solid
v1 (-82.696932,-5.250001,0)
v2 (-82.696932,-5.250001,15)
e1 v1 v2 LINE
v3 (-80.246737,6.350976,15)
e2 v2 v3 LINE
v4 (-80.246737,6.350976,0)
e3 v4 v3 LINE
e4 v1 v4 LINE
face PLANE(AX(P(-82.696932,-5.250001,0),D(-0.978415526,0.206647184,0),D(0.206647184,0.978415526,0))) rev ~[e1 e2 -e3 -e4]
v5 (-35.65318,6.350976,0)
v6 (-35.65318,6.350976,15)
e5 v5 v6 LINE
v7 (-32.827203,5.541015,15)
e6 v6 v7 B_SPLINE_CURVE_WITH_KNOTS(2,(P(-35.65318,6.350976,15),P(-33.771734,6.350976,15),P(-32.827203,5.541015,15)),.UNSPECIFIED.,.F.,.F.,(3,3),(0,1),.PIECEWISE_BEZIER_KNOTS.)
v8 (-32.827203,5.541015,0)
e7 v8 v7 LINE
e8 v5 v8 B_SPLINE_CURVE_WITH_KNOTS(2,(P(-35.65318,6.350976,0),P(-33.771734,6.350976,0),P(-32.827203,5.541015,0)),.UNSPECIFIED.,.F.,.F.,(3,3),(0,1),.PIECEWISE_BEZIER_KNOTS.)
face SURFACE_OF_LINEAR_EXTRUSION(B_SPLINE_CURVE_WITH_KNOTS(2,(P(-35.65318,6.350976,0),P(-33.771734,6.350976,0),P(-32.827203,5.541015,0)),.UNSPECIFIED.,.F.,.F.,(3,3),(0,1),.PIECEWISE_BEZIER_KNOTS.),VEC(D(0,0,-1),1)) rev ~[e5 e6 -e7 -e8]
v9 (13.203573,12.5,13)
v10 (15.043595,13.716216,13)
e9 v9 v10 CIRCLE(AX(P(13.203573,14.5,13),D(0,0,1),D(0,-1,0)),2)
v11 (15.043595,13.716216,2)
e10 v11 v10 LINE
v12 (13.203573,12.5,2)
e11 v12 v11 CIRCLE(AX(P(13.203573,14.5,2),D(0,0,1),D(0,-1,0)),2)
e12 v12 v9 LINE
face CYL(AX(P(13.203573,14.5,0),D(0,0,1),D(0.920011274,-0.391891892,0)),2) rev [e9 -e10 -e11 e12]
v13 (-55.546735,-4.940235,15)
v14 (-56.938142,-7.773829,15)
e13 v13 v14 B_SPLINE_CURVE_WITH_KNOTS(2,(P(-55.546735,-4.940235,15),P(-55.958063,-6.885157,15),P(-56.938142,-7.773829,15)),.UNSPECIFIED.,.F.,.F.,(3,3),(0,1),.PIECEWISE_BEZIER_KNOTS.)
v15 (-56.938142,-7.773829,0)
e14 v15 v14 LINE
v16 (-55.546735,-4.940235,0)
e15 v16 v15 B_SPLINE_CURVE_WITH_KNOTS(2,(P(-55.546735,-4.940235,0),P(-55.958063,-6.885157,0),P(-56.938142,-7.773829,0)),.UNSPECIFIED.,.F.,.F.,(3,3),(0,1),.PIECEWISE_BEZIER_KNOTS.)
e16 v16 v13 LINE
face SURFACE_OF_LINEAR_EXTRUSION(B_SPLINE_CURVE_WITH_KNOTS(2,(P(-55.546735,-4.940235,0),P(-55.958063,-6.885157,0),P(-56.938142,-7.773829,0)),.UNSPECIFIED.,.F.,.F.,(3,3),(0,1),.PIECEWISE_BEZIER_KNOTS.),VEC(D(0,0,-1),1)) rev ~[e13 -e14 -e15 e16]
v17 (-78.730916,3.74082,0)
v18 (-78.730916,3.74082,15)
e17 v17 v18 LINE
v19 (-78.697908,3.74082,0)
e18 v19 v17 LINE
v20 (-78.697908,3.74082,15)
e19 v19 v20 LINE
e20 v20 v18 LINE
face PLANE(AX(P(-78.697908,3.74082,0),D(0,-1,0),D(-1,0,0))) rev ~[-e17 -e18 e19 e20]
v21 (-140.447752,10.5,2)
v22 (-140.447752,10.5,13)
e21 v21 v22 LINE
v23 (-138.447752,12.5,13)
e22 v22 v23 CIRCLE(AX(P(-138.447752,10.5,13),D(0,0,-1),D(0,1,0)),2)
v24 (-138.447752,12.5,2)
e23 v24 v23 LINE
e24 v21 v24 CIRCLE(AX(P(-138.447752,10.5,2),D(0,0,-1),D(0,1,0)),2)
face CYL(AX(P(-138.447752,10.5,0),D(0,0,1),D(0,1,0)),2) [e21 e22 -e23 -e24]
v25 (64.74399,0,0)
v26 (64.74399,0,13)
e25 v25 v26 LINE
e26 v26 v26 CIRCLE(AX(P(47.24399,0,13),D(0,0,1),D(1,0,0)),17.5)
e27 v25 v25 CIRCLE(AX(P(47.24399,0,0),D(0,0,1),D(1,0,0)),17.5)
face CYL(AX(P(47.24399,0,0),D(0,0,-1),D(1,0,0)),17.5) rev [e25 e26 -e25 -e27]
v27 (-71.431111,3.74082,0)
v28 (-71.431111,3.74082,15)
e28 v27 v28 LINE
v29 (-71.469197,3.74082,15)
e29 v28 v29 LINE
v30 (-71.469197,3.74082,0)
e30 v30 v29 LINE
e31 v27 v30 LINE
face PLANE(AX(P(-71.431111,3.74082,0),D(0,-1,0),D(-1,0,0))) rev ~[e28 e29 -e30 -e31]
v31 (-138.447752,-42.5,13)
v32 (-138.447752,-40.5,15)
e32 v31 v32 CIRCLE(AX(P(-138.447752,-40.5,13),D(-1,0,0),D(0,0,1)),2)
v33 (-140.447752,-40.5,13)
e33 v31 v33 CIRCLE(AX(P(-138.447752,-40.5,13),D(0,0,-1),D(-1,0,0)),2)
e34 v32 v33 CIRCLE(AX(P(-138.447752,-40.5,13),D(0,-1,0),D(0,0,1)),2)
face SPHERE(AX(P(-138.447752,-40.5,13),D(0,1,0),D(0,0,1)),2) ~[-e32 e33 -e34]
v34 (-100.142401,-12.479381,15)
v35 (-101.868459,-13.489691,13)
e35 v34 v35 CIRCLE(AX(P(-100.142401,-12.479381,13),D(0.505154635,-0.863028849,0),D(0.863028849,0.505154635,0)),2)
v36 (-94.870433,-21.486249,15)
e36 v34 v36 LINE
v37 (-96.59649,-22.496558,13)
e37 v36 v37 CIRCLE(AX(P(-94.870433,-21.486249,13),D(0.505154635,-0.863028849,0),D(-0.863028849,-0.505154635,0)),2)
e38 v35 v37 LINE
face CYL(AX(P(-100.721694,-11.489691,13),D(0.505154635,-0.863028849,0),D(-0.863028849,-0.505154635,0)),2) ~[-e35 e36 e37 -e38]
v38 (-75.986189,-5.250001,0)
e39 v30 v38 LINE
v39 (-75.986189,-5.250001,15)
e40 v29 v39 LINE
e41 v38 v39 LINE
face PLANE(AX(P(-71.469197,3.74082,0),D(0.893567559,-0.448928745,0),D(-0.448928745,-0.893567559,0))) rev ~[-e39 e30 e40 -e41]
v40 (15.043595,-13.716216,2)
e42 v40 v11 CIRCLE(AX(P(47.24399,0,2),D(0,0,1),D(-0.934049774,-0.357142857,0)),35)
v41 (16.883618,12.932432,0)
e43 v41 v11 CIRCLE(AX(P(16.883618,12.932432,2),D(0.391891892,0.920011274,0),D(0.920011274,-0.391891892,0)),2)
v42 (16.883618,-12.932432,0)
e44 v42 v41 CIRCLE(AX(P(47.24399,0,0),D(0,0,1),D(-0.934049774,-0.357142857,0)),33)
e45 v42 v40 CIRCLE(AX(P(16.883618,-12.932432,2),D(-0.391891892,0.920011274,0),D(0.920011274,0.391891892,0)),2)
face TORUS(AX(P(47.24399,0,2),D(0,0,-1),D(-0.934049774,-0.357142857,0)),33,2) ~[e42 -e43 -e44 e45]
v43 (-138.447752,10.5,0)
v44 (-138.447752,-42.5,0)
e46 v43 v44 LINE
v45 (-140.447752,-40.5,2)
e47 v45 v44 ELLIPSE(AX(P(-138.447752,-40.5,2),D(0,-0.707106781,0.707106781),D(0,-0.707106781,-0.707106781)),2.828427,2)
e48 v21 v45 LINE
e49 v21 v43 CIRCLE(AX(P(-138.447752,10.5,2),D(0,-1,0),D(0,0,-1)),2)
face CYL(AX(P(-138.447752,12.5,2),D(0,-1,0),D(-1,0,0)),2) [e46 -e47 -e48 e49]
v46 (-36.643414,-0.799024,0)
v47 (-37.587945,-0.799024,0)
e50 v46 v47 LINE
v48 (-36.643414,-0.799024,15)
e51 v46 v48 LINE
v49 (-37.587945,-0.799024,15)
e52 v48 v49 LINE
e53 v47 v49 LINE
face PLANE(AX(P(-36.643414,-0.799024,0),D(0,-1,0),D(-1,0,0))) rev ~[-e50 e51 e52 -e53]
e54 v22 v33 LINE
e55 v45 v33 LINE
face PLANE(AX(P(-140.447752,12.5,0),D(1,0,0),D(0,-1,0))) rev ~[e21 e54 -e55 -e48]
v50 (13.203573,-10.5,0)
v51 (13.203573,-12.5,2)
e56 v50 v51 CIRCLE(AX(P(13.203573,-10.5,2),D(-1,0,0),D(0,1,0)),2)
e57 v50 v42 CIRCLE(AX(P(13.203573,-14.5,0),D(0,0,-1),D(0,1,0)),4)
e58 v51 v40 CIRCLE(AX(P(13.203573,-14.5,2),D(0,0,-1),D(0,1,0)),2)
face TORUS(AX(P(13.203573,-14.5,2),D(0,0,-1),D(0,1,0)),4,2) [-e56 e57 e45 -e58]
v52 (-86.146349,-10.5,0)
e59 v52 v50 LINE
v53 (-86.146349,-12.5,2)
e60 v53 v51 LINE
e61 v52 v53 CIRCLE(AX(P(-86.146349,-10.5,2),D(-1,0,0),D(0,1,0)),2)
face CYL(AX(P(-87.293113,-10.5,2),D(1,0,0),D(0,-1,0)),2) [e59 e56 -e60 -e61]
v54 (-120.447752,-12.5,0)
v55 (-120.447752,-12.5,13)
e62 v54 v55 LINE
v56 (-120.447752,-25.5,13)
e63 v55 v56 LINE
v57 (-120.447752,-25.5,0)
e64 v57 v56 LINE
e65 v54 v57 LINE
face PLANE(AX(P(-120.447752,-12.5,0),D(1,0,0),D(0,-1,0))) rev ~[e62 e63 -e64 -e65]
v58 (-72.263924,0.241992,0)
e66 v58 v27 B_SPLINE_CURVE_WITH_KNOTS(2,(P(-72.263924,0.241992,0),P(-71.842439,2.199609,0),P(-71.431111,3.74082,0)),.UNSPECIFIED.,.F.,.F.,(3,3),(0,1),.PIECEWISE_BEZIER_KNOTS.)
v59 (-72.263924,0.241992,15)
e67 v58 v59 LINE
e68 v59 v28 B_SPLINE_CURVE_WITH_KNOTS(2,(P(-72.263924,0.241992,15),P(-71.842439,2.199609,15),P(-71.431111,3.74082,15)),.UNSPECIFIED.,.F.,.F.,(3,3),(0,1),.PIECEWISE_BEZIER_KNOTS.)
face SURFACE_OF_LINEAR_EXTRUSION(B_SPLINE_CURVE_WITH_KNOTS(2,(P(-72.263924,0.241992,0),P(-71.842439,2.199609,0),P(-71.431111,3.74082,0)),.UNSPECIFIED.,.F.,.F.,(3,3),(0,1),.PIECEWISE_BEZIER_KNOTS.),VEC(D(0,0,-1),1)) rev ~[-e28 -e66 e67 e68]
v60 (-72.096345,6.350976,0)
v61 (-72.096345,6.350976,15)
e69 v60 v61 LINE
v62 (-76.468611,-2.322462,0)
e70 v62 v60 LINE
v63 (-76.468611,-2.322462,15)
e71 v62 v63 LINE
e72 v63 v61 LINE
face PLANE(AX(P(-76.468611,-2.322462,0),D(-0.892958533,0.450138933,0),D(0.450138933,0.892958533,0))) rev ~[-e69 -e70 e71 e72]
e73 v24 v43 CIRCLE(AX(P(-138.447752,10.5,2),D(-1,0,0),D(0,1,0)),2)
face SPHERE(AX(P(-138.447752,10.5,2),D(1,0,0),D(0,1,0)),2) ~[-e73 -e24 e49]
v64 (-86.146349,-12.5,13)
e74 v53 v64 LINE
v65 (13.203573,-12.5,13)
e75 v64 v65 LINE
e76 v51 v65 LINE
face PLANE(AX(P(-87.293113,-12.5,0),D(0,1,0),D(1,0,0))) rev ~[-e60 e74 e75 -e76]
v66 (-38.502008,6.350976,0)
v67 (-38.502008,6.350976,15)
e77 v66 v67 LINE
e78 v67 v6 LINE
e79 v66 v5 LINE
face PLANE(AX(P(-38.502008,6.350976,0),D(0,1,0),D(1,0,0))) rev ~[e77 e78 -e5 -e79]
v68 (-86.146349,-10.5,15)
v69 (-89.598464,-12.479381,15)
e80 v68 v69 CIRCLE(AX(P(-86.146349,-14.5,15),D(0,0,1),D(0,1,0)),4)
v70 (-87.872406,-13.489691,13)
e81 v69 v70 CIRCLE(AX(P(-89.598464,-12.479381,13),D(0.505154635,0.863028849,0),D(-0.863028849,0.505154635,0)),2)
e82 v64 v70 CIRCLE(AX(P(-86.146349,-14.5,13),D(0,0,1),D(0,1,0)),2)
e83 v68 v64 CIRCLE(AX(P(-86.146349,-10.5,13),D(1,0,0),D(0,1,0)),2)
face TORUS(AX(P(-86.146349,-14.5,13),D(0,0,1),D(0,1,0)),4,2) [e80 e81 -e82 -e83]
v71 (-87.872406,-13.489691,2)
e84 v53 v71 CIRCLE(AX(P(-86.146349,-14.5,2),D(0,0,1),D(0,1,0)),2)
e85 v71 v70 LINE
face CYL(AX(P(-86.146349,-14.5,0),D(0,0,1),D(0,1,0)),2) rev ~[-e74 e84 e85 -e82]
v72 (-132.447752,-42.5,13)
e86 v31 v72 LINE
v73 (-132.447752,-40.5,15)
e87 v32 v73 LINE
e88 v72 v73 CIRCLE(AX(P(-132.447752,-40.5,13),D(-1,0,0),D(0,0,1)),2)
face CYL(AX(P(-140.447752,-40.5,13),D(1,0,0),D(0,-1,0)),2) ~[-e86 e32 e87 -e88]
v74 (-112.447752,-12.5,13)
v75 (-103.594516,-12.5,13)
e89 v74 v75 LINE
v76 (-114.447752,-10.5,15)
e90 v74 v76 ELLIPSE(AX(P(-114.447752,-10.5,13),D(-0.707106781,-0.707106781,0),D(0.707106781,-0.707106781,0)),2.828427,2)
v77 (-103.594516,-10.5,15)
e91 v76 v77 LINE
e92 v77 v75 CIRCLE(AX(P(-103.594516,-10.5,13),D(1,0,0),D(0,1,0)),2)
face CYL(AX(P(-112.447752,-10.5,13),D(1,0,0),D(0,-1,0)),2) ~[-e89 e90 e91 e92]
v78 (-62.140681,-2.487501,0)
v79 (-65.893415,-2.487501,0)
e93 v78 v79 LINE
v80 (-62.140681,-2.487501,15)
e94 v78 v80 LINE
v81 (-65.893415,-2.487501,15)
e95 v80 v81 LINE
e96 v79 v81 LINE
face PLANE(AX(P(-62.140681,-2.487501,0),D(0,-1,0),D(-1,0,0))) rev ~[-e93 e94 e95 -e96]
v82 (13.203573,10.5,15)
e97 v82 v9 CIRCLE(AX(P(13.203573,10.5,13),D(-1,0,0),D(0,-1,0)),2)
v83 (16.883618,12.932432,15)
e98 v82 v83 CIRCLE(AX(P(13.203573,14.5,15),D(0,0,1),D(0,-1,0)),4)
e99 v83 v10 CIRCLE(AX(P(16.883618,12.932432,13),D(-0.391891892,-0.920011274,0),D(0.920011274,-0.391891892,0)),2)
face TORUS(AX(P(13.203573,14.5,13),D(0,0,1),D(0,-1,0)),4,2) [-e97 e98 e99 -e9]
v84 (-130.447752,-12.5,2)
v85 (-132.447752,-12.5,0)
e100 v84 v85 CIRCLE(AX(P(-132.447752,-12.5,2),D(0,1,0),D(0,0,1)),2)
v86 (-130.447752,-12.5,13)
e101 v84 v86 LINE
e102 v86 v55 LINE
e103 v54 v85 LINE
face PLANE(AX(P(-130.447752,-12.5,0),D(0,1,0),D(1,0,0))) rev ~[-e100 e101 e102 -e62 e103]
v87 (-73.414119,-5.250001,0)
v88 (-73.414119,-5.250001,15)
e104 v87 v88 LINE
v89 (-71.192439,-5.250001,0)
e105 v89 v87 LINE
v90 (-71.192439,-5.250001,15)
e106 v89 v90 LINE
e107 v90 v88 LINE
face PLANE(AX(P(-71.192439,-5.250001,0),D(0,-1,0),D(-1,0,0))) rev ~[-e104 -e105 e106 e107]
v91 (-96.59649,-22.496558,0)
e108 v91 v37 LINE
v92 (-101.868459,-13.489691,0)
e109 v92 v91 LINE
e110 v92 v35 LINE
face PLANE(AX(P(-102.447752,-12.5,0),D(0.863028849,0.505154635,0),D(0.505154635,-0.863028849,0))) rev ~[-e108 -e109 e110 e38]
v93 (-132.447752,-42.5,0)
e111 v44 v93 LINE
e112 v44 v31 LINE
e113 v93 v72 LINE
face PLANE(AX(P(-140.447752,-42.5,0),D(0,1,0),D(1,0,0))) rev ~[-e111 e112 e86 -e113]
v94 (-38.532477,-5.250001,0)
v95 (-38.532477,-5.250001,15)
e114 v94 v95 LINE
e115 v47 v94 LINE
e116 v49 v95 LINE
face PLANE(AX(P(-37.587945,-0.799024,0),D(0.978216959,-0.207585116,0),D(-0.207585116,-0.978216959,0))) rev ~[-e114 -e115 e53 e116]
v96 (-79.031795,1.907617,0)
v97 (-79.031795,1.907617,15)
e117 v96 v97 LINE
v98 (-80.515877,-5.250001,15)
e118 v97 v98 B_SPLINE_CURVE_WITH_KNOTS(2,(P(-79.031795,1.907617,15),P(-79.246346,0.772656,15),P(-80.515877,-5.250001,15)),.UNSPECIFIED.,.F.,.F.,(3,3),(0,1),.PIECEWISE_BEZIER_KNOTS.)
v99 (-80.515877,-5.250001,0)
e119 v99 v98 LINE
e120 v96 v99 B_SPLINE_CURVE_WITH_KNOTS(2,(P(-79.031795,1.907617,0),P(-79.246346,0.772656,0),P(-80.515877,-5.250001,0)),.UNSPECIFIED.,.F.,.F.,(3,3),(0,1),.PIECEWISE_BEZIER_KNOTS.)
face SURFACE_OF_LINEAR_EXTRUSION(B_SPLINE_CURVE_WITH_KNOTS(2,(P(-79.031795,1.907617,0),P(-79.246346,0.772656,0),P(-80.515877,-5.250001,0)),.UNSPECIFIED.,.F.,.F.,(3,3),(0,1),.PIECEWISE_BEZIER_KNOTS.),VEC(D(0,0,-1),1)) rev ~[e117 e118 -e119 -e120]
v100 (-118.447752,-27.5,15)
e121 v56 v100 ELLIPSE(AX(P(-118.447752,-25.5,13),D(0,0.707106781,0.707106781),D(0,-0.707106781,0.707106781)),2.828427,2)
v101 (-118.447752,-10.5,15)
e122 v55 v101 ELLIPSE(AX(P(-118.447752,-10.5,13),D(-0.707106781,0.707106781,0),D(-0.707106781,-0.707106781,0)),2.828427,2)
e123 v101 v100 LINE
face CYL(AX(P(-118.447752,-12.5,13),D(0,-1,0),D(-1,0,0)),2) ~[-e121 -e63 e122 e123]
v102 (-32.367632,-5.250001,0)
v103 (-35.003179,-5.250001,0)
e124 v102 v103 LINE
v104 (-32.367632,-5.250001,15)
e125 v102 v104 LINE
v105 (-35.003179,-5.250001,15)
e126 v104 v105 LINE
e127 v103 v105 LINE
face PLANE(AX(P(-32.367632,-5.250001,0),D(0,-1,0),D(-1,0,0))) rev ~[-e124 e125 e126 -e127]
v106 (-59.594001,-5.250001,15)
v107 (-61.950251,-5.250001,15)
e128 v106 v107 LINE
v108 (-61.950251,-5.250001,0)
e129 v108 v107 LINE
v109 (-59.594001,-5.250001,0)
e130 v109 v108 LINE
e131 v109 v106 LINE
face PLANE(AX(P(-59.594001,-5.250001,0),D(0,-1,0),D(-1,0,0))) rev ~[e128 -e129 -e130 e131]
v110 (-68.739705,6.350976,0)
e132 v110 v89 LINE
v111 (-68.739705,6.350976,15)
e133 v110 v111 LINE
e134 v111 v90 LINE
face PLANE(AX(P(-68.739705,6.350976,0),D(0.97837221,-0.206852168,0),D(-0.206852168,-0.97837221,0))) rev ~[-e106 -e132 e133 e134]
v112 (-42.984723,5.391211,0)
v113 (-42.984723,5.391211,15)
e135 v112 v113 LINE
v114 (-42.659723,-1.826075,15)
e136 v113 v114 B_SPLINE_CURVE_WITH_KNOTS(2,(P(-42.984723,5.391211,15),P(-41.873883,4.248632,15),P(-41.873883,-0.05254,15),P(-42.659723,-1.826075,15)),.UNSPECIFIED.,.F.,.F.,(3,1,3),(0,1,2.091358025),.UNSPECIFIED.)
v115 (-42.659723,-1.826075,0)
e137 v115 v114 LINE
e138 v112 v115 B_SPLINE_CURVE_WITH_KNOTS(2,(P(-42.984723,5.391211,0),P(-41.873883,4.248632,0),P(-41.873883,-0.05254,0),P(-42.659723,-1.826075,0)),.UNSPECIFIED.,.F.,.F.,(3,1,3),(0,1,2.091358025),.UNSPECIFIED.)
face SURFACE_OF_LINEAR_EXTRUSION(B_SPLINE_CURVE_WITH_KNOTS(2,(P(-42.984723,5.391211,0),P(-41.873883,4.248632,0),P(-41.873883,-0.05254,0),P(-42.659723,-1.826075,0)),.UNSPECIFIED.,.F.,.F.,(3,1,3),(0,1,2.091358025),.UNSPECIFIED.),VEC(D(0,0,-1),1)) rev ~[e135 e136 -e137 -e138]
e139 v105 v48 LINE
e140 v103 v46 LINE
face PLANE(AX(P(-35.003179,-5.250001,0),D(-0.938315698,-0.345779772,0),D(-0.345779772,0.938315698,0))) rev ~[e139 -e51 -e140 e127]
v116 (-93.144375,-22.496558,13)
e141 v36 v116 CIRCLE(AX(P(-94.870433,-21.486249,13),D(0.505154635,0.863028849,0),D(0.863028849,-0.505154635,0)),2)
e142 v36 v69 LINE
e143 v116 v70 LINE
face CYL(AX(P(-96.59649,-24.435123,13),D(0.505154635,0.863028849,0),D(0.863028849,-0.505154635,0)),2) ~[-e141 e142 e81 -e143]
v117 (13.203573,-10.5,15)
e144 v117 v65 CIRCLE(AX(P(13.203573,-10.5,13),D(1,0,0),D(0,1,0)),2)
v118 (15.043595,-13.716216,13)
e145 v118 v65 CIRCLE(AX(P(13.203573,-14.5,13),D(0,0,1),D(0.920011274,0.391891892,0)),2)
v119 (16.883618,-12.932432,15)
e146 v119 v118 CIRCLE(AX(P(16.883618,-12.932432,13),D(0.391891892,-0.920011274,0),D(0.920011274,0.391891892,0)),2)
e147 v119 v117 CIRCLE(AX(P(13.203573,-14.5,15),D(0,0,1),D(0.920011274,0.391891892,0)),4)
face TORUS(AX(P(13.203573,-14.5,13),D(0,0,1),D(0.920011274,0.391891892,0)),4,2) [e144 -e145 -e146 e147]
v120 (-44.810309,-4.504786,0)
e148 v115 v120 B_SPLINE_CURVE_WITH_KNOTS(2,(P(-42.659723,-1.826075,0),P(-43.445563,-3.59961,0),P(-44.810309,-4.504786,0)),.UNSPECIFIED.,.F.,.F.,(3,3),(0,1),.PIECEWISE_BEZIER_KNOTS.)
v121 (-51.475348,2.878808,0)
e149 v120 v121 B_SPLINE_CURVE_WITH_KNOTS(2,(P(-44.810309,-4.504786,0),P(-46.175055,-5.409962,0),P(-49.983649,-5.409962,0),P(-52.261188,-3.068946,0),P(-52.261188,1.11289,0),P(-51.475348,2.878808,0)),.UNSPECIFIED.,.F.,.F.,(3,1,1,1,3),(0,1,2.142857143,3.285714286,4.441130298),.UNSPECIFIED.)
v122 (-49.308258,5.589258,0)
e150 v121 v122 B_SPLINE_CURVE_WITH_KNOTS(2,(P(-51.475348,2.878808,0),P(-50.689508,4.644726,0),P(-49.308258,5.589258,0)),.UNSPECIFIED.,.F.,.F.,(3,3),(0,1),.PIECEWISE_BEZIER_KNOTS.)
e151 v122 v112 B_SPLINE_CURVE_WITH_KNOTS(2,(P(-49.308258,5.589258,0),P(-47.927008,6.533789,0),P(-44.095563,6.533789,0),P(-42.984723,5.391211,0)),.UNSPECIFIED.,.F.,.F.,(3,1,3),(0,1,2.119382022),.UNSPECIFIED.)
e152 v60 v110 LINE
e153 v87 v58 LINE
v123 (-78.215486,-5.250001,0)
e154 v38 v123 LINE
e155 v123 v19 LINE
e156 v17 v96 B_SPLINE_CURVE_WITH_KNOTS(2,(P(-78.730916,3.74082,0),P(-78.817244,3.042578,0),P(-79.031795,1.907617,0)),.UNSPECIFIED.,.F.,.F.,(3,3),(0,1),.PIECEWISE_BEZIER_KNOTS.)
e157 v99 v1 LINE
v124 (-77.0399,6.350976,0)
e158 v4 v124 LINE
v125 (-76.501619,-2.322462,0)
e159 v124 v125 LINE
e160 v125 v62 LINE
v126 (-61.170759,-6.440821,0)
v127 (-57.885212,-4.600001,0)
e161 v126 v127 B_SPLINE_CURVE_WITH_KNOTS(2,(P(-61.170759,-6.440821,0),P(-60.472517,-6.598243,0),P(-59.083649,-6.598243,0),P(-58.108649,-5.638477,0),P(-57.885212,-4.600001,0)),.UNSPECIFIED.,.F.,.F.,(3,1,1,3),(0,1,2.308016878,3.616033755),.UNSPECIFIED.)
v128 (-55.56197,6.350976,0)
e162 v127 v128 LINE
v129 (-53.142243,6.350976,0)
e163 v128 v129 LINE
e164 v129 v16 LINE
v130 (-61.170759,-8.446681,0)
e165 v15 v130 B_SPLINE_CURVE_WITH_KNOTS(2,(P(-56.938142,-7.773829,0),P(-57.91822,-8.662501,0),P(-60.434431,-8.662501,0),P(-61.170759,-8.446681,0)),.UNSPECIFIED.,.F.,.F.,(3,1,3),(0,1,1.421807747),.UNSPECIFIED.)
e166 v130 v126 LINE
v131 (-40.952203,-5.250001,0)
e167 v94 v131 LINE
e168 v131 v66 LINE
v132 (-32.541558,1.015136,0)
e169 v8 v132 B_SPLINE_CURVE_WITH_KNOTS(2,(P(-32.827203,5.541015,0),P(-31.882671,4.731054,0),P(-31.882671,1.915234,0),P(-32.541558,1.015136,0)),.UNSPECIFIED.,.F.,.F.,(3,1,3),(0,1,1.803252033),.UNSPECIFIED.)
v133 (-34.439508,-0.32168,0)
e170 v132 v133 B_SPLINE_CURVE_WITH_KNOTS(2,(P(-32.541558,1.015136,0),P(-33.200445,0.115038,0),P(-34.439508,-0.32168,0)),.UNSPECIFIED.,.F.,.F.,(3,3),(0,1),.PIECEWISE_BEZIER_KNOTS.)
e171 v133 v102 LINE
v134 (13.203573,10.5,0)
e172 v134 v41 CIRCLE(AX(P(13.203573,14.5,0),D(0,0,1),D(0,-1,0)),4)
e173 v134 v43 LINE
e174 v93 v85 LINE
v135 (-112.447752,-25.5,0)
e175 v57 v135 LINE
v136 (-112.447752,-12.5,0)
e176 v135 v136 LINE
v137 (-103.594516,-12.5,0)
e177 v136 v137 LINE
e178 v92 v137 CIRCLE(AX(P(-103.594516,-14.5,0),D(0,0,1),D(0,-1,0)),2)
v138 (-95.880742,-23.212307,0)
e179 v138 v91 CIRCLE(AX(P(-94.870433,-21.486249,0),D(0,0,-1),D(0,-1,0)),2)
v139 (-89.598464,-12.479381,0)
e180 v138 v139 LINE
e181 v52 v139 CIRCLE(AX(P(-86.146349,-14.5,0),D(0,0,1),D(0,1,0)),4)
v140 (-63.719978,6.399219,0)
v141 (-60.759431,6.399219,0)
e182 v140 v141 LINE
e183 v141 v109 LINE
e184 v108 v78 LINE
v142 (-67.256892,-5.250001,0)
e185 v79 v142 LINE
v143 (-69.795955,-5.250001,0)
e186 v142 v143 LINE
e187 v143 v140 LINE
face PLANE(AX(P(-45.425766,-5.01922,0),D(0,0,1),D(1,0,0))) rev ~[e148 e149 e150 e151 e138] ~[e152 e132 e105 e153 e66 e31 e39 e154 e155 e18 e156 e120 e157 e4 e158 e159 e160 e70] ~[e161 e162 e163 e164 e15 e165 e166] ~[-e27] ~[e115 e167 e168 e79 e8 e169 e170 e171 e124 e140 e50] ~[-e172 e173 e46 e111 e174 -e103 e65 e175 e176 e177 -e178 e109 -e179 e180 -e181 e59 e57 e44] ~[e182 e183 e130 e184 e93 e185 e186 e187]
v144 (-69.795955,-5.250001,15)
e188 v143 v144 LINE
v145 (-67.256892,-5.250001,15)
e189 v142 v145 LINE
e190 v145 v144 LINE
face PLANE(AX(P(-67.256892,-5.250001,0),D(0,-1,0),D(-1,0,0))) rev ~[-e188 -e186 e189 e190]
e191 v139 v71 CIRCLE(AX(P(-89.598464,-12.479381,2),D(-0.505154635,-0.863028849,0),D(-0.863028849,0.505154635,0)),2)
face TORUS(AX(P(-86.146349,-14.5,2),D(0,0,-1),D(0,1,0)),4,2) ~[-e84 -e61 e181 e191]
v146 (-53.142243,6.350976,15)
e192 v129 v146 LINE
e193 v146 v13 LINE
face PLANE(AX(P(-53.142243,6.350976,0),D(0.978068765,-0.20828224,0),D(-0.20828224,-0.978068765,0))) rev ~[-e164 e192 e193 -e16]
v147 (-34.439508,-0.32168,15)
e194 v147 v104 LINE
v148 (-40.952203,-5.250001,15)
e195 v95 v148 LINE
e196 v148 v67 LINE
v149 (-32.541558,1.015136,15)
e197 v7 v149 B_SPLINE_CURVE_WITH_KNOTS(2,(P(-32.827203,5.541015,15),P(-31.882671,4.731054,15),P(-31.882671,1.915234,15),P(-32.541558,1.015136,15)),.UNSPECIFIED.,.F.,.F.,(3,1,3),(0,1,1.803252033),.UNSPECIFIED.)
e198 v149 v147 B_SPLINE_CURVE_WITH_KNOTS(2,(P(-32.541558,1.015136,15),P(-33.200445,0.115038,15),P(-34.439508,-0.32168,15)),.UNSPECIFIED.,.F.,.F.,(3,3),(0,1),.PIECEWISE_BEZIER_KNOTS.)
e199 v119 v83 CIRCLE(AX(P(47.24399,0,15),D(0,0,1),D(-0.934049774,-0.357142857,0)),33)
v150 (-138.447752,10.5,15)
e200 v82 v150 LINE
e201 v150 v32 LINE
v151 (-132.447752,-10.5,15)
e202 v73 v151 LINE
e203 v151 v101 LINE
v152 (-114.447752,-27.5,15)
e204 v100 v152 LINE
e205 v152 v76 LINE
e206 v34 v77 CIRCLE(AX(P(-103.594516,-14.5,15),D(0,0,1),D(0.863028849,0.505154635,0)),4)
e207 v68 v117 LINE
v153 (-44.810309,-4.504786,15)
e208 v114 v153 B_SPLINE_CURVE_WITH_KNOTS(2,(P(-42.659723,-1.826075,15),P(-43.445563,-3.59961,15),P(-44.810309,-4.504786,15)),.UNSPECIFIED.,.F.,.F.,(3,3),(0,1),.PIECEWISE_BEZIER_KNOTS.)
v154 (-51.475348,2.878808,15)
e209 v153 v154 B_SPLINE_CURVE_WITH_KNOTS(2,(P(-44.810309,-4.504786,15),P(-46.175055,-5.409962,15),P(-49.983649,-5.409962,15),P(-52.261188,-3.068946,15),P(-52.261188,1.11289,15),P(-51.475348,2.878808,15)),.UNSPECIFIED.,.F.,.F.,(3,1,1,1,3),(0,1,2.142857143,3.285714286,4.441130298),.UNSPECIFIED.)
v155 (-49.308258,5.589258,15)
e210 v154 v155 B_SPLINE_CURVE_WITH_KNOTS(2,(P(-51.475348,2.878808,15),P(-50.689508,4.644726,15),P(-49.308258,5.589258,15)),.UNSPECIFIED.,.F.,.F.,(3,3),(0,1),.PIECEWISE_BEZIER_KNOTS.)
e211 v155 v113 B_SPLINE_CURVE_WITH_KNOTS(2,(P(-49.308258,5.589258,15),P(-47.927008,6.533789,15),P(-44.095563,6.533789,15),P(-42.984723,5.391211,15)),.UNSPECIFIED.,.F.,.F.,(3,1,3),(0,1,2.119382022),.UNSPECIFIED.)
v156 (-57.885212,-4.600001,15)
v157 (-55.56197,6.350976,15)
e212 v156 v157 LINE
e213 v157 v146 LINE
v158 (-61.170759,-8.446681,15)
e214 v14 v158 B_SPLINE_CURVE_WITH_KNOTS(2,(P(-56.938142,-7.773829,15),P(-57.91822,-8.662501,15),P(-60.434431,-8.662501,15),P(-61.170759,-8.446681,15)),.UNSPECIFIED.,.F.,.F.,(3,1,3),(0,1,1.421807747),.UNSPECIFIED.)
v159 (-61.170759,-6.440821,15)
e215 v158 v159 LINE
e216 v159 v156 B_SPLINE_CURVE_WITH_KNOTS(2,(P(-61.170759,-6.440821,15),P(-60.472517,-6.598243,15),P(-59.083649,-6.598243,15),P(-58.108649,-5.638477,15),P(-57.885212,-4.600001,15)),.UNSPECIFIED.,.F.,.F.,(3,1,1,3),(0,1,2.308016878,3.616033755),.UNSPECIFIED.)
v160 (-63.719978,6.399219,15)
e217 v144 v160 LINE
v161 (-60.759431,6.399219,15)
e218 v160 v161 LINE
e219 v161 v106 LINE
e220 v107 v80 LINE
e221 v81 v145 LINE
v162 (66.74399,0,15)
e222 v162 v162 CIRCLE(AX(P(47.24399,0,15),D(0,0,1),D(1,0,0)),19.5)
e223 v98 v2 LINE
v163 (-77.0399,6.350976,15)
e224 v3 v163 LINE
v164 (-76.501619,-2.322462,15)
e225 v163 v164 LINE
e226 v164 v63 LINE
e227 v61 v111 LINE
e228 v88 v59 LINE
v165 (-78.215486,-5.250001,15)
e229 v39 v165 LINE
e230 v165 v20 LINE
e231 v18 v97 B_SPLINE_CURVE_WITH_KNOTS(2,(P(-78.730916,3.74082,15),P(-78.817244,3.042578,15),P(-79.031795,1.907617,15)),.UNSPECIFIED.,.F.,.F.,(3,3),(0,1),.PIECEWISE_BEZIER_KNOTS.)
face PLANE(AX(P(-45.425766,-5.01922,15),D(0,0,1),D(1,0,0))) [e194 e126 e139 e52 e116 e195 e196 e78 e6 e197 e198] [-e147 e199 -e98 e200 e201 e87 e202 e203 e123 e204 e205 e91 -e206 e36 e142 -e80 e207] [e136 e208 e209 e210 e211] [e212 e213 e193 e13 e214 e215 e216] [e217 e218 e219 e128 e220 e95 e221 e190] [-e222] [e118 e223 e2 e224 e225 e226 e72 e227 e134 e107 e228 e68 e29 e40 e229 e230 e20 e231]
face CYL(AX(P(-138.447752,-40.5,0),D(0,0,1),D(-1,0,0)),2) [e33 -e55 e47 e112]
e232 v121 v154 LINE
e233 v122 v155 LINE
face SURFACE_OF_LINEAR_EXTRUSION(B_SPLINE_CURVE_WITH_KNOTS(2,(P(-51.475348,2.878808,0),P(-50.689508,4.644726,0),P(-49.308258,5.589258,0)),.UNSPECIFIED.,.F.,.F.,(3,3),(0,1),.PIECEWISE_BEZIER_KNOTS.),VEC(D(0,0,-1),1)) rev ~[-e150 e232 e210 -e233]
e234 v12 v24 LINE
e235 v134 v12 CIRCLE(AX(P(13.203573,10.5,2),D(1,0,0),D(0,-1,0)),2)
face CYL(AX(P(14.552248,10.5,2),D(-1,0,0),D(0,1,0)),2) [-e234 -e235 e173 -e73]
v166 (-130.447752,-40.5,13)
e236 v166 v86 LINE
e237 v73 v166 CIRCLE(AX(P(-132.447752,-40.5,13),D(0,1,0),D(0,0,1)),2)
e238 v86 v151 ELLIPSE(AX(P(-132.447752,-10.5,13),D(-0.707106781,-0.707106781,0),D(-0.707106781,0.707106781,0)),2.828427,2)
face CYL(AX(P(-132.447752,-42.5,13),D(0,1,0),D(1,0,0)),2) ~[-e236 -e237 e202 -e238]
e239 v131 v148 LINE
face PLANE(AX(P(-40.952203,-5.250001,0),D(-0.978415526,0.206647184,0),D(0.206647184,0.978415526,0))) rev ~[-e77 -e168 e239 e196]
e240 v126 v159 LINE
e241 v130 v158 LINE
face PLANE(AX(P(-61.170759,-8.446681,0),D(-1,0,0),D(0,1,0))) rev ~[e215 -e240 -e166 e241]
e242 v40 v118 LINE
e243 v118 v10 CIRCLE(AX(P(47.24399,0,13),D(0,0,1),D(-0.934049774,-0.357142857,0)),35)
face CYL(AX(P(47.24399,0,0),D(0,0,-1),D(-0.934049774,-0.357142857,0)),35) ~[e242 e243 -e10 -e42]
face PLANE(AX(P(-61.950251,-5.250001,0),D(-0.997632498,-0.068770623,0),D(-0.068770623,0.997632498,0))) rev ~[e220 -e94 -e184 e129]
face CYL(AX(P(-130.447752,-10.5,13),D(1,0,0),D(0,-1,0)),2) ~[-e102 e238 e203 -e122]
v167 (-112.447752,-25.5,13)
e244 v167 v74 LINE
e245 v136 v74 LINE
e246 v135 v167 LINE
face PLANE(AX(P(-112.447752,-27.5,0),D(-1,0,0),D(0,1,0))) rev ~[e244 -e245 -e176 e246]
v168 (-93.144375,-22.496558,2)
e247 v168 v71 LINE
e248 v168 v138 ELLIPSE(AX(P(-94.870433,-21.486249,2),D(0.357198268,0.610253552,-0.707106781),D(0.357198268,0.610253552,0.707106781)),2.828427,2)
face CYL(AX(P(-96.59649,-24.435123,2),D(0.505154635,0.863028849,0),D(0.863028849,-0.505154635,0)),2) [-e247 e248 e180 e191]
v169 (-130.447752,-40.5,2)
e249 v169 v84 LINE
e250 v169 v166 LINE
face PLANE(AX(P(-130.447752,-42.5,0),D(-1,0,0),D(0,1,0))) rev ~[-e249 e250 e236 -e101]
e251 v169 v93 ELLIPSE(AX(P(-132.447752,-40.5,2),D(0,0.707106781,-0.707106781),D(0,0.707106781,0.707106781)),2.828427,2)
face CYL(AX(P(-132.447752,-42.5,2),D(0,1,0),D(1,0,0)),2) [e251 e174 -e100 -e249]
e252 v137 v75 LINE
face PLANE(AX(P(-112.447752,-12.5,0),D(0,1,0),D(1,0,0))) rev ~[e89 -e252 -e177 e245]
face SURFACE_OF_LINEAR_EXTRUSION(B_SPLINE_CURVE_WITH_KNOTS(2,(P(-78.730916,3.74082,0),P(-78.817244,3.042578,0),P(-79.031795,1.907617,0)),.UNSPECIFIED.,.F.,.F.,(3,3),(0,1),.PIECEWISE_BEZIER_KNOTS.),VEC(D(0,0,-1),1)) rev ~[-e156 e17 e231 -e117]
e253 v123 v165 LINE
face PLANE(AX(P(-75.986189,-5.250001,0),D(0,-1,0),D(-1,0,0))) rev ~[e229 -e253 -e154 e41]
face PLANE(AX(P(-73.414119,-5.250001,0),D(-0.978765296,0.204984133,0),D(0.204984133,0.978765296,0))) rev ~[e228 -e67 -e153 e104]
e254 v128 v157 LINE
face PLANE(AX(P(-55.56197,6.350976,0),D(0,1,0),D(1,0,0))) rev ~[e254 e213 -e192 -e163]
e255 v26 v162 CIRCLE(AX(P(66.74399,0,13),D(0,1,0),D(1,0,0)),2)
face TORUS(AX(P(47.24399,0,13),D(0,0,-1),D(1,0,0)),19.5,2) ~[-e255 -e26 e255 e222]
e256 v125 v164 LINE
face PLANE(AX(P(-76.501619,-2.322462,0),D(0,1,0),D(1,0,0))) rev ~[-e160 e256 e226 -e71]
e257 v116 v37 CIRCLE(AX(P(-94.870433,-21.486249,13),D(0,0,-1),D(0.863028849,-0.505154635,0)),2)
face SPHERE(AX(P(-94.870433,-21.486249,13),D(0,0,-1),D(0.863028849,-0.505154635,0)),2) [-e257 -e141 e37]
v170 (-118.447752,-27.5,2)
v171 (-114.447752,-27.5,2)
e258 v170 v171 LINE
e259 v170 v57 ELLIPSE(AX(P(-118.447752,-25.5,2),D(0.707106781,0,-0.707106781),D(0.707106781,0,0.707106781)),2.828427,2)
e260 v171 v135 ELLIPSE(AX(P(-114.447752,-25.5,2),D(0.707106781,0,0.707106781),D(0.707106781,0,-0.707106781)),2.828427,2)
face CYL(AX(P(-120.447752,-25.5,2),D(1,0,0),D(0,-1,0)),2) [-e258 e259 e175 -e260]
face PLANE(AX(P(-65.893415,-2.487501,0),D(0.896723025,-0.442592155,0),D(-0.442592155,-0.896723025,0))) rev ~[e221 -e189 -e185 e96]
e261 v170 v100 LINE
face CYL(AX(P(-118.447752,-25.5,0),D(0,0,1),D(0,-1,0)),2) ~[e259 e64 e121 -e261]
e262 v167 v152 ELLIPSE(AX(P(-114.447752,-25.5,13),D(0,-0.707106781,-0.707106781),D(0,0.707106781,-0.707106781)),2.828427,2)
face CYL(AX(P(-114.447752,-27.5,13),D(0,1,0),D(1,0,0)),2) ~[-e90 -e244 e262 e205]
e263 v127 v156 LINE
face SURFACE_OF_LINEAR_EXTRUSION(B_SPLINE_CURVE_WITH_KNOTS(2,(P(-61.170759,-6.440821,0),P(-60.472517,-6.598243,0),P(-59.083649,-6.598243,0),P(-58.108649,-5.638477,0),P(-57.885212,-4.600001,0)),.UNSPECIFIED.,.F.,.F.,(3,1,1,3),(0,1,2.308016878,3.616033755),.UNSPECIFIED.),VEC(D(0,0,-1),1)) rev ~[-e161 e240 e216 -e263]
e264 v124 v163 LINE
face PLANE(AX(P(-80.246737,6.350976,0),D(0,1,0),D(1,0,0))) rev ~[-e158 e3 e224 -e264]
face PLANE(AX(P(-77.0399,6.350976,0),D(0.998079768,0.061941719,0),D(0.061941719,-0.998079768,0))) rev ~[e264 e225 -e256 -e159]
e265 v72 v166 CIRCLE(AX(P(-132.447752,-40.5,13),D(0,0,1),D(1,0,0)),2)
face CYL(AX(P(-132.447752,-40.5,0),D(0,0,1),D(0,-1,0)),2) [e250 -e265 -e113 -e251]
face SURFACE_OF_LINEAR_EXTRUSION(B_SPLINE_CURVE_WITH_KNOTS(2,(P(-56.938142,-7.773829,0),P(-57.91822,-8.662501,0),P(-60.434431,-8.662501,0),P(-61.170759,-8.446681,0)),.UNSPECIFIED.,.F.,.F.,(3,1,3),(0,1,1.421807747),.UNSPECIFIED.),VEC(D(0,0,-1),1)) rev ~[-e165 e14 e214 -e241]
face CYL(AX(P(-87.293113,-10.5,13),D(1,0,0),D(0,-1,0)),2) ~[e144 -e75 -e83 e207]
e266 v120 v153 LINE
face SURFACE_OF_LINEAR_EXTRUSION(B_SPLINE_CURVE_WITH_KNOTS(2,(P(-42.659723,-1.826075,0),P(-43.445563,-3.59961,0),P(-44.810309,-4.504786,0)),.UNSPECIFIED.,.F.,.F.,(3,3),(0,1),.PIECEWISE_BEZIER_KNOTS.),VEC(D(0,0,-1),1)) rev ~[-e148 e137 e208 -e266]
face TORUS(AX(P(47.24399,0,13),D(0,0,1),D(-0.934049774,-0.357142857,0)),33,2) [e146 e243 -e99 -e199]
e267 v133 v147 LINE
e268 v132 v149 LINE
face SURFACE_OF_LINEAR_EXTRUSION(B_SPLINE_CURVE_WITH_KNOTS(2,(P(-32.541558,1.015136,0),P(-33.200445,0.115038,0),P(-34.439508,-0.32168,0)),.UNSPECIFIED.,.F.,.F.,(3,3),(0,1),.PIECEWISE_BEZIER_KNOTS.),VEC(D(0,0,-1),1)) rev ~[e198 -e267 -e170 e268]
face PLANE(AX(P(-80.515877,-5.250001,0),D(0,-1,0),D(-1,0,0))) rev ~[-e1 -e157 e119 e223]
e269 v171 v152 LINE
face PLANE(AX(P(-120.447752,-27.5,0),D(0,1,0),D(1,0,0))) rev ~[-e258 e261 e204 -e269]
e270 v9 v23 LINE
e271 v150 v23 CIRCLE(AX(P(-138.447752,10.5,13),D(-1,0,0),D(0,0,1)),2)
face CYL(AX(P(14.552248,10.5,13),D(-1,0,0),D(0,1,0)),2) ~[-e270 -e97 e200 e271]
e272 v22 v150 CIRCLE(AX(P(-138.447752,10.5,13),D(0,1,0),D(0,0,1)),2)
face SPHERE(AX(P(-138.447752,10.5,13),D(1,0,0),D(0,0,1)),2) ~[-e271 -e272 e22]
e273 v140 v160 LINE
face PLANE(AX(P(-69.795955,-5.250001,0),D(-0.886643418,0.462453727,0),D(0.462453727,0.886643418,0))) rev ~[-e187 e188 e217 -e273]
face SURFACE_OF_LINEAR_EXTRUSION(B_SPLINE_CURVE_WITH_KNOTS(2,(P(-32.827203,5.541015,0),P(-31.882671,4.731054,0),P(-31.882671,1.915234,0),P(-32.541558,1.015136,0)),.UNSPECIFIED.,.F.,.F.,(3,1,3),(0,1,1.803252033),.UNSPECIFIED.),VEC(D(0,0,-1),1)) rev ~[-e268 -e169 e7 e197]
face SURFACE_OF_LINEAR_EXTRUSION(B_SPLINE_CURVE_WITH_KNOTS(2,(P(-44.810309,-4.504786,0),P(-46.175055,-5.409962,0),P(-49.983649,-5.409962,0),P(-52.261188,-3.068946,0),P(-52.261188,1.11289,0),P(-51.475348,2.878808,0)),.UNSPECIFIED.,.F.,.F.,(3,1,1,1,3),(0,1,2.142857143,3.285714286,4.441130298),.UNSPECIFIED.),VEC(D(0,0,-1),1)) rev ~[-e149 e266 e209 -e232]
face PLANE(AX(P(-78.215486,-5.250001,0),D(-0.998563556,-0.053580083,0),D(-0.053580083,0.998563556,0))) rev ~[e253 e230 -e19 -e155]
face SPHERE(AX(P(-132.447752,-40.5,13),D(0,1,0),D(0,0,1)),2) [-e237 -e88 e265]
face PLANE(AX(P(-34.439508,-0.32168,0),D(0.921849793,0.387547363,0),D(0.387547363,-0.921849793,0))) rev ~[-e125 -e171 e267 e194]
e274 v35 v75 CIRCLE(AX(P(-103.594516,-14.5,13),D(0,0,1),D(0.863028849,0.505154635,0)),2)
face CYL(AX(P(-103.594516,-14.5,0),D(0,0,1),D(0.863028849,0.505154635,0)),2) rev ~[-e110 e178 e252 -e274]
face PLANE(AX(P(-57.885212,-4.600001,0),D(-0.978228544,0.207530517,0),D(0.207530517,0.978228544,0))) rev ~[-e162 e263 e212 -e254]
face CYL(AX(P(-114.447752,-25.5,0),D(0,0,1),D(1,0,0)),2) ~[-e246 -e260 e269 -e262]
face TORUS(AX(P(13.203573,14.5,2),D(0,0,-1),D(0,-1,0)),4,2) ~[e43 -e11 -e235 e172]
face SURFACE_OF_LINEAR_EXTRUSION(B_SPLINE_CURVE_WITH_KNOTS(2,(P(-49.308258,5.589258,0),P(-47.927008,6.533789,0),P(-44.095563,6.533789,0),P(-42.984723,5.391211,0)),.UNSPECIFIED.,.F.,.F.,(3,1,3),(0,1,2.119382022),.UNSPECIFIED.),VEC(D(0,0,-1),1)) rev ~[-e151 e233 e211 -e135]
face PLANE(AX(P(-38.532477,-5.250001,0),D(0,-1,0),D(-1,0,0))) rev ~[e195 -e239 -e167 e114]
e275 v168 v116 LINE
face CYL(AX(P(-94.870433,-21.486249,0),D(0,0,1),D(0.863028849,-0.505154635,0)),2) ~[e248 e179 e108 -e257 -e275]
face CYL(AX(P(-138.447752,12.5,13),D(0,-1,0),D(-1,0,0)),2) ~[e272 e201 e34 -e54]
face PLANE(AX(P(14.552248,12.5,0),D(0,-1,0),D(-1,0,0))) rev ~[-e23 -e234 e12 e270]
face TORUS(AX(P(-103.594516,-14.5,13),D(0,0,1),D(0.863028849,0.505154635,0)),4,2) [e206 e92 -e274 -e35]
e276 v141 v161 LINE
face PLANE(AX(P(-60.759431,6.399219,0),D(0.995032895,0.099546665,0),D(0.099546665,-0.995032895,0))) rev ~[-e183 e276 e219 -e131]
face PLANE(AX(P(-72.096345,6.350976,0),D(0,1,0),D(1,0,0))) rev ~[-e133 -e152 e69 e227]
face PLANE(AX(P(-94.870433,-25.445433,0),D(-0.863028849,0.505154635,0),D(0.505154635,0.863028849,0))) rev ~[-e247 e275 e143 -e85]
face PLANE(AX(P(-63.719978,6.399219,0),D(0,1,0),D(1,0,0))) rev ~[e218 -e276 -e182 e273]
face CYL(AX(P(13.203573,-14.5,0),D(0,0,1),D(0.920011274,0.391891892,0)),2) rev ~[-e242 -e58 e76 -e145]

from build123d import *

# Parameters (mm, degrees)
F0_R     = 17.5
F1_DEPTH = 15
F2_R     = 2


with BuildPart() as f1:
    # F0 (on Top) → F1 (new body)
    with BuildSketch(Plane.XY):
        with BuildLine():
            ThreePointArc((14.5522479275, -12.5), (82.2439900041, 0), (14.5522479275, 12.5))
            Line((14.5522479275, 12.5), (-140.4477520725, 12.5))
            Line((-140.4477520725, 12.5), (-140.4477520725, -12.5))
            Line((-140.4477520725, -12.5), (-140.4477520725, -42.5))
            Line((-140.4477520725, -42.5), (-130.4477520725, -42.5))
            Line((-130.4477520725, -42.5), (-130.4477520725, -12.5))
            Line((-130.4477520725, -12.5), (-120.4477520725, -12.5))
            Line((-120.4477520725, -12.5), (-120.4477520725, -27.5))
            Line((-120.4477520725, -27.5), (-112.4477520725, -27.5))
            Line((-112.4477520725, -27.5), (-112.4477520725, -12.5))
            Line((-112.4477520725, -12.5), (-102.4477520725, -12.5))
            Line((-102.4477520725, -12.5), (-94.8704325514, -25.4454327419))
            Line((-94.8704325514, -25.4454327419), (-87.2931130304, -12.5))
            Line((-87.2931130304, -12.5), (14.5522479275, -12.5))
        make_face()
        with BuildLine():
            Line((-76.5016191468, -2.3224616444), (-76.4686113325, -2.3224616444))
            Line((-76.4686113325, -2.3224616444), (-72.0963454781, 6.3509763107))
            Line((-72.0963454781, 6.3509763107), (-68.739704677, 6.3509763107))
            Line((-68.739704677, 6.3509763107), (-71.1924391807, -5.2500008605))
            Line((-71.1924391807, -5.2500008605), (-73.4141189848, -5.2500008605))
            Line((-73.4141189848, -5.2500008605), (-72.2639236119, 0.2419916151))
            add(Edge.make_bspline(
                [(-72.2639236119, 0.2419916151), (-71.8424392148, 2.1996089054), (-71.4311110682, 3.7408199237)],
                knots=[0, 0, 0, 1, 1, 1], degree=2))
            Line((-71.4311110682, 3.7408199237), (-71.4691970077, 3.7408199237))
            Line((-71.4691970077, 3.7408199237), (-75.9861894322, -5.2500008605))
            Line((-75.9861894322, -5.2500008605), (-78.2154864242, -5.2500008605))
            Line((-78.2154864242, -5.2500008605), (-78.6979083245, 3.7408199237))
            Line((-78.6979083245, 3.7408199237), (-78.7309161387, 3.7408199237))
            add(Edge.make_bspline(
                [(-78.7309161387, 3.7408199237), (-78.8172442683, 3.0425776996), (-79.0317950608, 1.9076167025)],
                knots=[0, 0, 0, 1, 1, 1], degree=2))
            add(Edge.make_bspline(
                [(-79.0317950608, 1.9076167025), (-79.2463458533, 0.7726557055), (-80.5158771699, -5.2500008605)],
                knots=[0, 0, 0, 1, 1, 1], degree=2))
            Line((-80.5158771699, -5.2500008605), (-82.6969319718, -5.2500008605))
            Line((-82.6969319718, -5.2500008605), (-80.2467365308, 6.3509763107))
            Line((-80.2467365308, 6.3509763107), (-77.039900425, 6.3509763107))
            Line((-77.039900425, 6.3509763107), (-76.5016191468, -2.3224616444))
        make_face(mode=Mode.SUBTRACT)
        Polygon((-61.9502511957, -5.2500008605), (-62.1406808932, -2.4875007156), (-65.8934154651, -2.4875007156), (-67.2568920992, -5.2500008605), (-69.7959547324, -5.2500008605), (-63.7199778511, 6.3992185007), (-60.7594308207, 6.3992185007), (-59.5940010721, -5.2500008605), align=None, mode=Mode.SUBTRACT)
        with BuildLine():
            add(Edge.make_bspline(
                [(-56.9381415577, -7.773829118), (-57.9182197341, -8.6625010396), (-59.6879463895, -8.6625010396)],
                knots=[0, 0, 0, 1, 1, 1], degree=2))
            add(Edge.make_bspline(
                [(-59.6879463895, -8.6625010396), (-60.4344308037, -8.6625010396), (-61.1707589673, -8.4466807158)],
                knots=[0, 0, 0, 1, 1, 1], degree=2))
            Line((-61.1707589673, -8.4466807158), (-61.1707589673, -6.4408212355))
            add(Edge.make_bspline(
                [(-61.1707589673, -6.4408212355), (-60.4725167432, -6.5982431188), (-59.8707588991, -6.5982431188)],
                knots=[0, 0, 0, 1, 1, 1], degree=2))
            add(Edge.make_bspline(
                [(-59.8707588991, -6.5982431188), (-59.0836494828, -6.5982431188), (-58.5961494572, -6.1183602811)],
                knots=[0, 0, 0, 1, 1, 1], degree=2))
            add(Edge.make_bspline(
                [(-58.5961494572, -6.1183602811), (-58.1086494316, -5.6384774434), (-57.8852119199, -4.6000008264)],
                knots=[0, 0, 0, 1, 1, 1], degree=2))
            Line((-57.8852119199, -4.6000008264), (-55.5619696105, 6.3509763107))
            Line((-55.5619696105, 6.3509763107), (-53.142242921, 6.3509763107))
            Line((-53.142242921, 6.3509763107), (-55.5467352347, -4.9402352193))
            add(Edge.make_bspline(
                [(-55.5467352347, -4.9402352193), (-55.9580633813, -6.8851571963), (-56.9381415577, -7.773829118)],
                knots=[0, 0, 0, 1, 1, 1], degree=2))
        make_face(mode=Mode.SUBTRACT)
        with BuildLine():
            add(Edge.make_bspline(
                [(-42.9847228568, 5.3912106353), (-41.8738829548, 4.2486324504), (-41.8738829548, 2.1919917175)],
                knots=[0, 0, 0, 1, 1, 1], degree=2))
            add(Edge.make_bspline(
                [(-41.8738829548, 2.1919917175), (-41.8738829548, -0.0525396503), (-42.6597228397, -1.8260748996)],
                knots=[0, 0, 0, 1, 1, 1], degree=2))
            add(Edge.make_bspline(
                [(-42.6597228397, -1.8260748996), (-43.4455627247, -3.5996101489), (-44.8103088901, -4.5047859777)],
                knots=[0, 0, 0, 1, 1, 1], degree=2))
            add(Edge.make_bspline(
                [(-44.8103088901, -4.5047859777), (-46.1750550555, -5.4099618064), (-47.9523988987, -5.4099618064)],
                knots=[0, 0, 0, 1, 1, 1], degree=2))
            add(Edge.make_bspline(
                [(-47.9523988987, -5.4099618064), (-49.9836490053, -5.4099618064), (-51.1224185963, -4.2394539325)],
                knots=[0, 0, 0, 1, 1, 1], degree=2))
            add(Edge.make_bspline(
                [(-51.1224185963, -4.2394539325), (-52.2611881873, -3.0689460586), (-52.2611881873, -0.989453762)],
                knots=[0, 0, 0, 1, 1, 1], degree=2))
            add(Edge.make_bspline(
                [(-52.2611881873, -0.989453762), (-52.2611881873, 1.1128900983), (-51.4753483023, 2.8788081597)],
                knots=[0, 0, 0, 1, 1, 1], degree=2))
            add(Edge.make_bspline(
                [(-51.4753483023, 2.8788081597), (-50.6895084173, 4.6447262212), (-49.3082583449, 5.5892575207)],
                knots=[0, 0, 0, 1, 1, 1], degree=2))
            add(Edge.make_bspline(
                [(-49.3082583449, 5.5892575207), (-47.9270082724, 6.5337888203), (-46.1191956775, 6.5337888203)],
                knots=[0, 0, 0, 1, 1, 1], degree=2))
            add(Edge.make_bspline(
                [(-46.1191956775, 6.5337888203), (-44.0955627588, 6.5337888203), (-42.9847228568, 5.3912106353)],
                knots=[0, 0, 0, 1, 1, 1], degree=2))
        make_face(mode=Mode.SUBTRACT)
        with BuildLine():
            Line((-36.6434139303, -0.7990240645), (-37.5879452299, -0.7990240645))
            Line((-37.5879452299, -0.7990240645), (-38.5324765294, -5.2500008605))
            Line((-38.5324765294, -5.2500008605), (-40.9522032189, -5.2500008605))
            Line((-40.9522032189, -5.2500008605), (-38.5020077778, 6.3509763107))
            Line((-38.5020077778, 6.3509763107), (-35.6531795033, 6.3509763107))
            add(Edge.make_bspline(
                [(-35.6531795033, 6.3509763107), (-33.7717340921, 6.3509763107), (-32.8272027926, 5.5410153307)],
                knots=[0, 0, 0, 1, 1, 1], degree=2))
            add(Edge.make_bspline(
                [(-32.8272027926, 5.5410153307), (-31.882671493, 4.7310543507), (-31.882671493, 3.1695308313)],
                knots=[0, 0, 0, 1, 1, 1], degree=2))
            add(Edge.make_bspline(
                [(-31.882671493, 3.1695308313), (-31.882671493, 1.9152338904), (-32.5415582463, 1.015136187)],
                knots=[0, 0, 0, 1, 1, 1], degree=2))
            add(Edge.make_bspline(
                [(-32.5415582463, 1.015136187), (-33.2004449996, 0.1150384835), (-34.4395075647, -0.3216802894)],
                knots=[0, 0, 0, 1, 1, 1], degree=2))
            Line((-34.4395075647, -0.3216802894), (-32.3676324559, -5.2500008605))
            Line((-32.3676324559, -5.2500008605), (-35.0031794692, -5.2500008605))
            Line((-35.0031794692, -5.2500008605), (-36.6434139303, -0.7990240645))
        make_face(mode=Mode.SUBTRACT)
        with Locations((47.2439900041, 0)):
            Circle(F0_R, mode=Mode.SUBTRACT)
    extrude(amount=F1_DEPTH)

    # F2
    f2_edges = [f1.edges().sort_by_distance(p)[0] for p in [
        (-62.947752, 12.5, 15),
        (82.24399, 0, 15),
        (-36.370433, -12.5, 15),
        (29.74399, 0, 15),
        (-91.081773, -18.972716, 15),
        (-98.659092, -18.972716, 15),
        (-107.447752, -12.5, 15),
        (-112.447752, -20, 15),
        (-120.447752, -20, 15),
        (-130.447752, -27.5, 15),
        (-140.447752, -15, 15),
        (-135.447752, -42.5, 15),
        (-62.947752, 12.5, 0),
        (-140.447752, 12.5, 7.5),
        (-140.447752, -15, 0),
        (-140.447752, -42.5, 7.5),
        (82.24399, 0, 0),
        (-130.447752, -27.5, 0),
        (-116.447752, -27.5, 0),
        (-130.447752, -42.5, 7.5),
        (-120.447752, -27.5, 7.5),
        (-102.447752, -12.5, 7.5),
        (-94.870433, -25.445433, 7.5),
        (-87.293113, -12.5, 7.5),
        (-112.447752, -27.5, 7.5),
        (14.552248, 12.5, 7.5),
        (14.552248, -12.5, 7.5),
        (-36.370433, -12.5, 0),
        (-125.447752, -12.5, 15),
        (-91.081773, -18.972716, 0),
    ]]
    fillet(f2_edges, radius=F2_R)


solid = f1.part
